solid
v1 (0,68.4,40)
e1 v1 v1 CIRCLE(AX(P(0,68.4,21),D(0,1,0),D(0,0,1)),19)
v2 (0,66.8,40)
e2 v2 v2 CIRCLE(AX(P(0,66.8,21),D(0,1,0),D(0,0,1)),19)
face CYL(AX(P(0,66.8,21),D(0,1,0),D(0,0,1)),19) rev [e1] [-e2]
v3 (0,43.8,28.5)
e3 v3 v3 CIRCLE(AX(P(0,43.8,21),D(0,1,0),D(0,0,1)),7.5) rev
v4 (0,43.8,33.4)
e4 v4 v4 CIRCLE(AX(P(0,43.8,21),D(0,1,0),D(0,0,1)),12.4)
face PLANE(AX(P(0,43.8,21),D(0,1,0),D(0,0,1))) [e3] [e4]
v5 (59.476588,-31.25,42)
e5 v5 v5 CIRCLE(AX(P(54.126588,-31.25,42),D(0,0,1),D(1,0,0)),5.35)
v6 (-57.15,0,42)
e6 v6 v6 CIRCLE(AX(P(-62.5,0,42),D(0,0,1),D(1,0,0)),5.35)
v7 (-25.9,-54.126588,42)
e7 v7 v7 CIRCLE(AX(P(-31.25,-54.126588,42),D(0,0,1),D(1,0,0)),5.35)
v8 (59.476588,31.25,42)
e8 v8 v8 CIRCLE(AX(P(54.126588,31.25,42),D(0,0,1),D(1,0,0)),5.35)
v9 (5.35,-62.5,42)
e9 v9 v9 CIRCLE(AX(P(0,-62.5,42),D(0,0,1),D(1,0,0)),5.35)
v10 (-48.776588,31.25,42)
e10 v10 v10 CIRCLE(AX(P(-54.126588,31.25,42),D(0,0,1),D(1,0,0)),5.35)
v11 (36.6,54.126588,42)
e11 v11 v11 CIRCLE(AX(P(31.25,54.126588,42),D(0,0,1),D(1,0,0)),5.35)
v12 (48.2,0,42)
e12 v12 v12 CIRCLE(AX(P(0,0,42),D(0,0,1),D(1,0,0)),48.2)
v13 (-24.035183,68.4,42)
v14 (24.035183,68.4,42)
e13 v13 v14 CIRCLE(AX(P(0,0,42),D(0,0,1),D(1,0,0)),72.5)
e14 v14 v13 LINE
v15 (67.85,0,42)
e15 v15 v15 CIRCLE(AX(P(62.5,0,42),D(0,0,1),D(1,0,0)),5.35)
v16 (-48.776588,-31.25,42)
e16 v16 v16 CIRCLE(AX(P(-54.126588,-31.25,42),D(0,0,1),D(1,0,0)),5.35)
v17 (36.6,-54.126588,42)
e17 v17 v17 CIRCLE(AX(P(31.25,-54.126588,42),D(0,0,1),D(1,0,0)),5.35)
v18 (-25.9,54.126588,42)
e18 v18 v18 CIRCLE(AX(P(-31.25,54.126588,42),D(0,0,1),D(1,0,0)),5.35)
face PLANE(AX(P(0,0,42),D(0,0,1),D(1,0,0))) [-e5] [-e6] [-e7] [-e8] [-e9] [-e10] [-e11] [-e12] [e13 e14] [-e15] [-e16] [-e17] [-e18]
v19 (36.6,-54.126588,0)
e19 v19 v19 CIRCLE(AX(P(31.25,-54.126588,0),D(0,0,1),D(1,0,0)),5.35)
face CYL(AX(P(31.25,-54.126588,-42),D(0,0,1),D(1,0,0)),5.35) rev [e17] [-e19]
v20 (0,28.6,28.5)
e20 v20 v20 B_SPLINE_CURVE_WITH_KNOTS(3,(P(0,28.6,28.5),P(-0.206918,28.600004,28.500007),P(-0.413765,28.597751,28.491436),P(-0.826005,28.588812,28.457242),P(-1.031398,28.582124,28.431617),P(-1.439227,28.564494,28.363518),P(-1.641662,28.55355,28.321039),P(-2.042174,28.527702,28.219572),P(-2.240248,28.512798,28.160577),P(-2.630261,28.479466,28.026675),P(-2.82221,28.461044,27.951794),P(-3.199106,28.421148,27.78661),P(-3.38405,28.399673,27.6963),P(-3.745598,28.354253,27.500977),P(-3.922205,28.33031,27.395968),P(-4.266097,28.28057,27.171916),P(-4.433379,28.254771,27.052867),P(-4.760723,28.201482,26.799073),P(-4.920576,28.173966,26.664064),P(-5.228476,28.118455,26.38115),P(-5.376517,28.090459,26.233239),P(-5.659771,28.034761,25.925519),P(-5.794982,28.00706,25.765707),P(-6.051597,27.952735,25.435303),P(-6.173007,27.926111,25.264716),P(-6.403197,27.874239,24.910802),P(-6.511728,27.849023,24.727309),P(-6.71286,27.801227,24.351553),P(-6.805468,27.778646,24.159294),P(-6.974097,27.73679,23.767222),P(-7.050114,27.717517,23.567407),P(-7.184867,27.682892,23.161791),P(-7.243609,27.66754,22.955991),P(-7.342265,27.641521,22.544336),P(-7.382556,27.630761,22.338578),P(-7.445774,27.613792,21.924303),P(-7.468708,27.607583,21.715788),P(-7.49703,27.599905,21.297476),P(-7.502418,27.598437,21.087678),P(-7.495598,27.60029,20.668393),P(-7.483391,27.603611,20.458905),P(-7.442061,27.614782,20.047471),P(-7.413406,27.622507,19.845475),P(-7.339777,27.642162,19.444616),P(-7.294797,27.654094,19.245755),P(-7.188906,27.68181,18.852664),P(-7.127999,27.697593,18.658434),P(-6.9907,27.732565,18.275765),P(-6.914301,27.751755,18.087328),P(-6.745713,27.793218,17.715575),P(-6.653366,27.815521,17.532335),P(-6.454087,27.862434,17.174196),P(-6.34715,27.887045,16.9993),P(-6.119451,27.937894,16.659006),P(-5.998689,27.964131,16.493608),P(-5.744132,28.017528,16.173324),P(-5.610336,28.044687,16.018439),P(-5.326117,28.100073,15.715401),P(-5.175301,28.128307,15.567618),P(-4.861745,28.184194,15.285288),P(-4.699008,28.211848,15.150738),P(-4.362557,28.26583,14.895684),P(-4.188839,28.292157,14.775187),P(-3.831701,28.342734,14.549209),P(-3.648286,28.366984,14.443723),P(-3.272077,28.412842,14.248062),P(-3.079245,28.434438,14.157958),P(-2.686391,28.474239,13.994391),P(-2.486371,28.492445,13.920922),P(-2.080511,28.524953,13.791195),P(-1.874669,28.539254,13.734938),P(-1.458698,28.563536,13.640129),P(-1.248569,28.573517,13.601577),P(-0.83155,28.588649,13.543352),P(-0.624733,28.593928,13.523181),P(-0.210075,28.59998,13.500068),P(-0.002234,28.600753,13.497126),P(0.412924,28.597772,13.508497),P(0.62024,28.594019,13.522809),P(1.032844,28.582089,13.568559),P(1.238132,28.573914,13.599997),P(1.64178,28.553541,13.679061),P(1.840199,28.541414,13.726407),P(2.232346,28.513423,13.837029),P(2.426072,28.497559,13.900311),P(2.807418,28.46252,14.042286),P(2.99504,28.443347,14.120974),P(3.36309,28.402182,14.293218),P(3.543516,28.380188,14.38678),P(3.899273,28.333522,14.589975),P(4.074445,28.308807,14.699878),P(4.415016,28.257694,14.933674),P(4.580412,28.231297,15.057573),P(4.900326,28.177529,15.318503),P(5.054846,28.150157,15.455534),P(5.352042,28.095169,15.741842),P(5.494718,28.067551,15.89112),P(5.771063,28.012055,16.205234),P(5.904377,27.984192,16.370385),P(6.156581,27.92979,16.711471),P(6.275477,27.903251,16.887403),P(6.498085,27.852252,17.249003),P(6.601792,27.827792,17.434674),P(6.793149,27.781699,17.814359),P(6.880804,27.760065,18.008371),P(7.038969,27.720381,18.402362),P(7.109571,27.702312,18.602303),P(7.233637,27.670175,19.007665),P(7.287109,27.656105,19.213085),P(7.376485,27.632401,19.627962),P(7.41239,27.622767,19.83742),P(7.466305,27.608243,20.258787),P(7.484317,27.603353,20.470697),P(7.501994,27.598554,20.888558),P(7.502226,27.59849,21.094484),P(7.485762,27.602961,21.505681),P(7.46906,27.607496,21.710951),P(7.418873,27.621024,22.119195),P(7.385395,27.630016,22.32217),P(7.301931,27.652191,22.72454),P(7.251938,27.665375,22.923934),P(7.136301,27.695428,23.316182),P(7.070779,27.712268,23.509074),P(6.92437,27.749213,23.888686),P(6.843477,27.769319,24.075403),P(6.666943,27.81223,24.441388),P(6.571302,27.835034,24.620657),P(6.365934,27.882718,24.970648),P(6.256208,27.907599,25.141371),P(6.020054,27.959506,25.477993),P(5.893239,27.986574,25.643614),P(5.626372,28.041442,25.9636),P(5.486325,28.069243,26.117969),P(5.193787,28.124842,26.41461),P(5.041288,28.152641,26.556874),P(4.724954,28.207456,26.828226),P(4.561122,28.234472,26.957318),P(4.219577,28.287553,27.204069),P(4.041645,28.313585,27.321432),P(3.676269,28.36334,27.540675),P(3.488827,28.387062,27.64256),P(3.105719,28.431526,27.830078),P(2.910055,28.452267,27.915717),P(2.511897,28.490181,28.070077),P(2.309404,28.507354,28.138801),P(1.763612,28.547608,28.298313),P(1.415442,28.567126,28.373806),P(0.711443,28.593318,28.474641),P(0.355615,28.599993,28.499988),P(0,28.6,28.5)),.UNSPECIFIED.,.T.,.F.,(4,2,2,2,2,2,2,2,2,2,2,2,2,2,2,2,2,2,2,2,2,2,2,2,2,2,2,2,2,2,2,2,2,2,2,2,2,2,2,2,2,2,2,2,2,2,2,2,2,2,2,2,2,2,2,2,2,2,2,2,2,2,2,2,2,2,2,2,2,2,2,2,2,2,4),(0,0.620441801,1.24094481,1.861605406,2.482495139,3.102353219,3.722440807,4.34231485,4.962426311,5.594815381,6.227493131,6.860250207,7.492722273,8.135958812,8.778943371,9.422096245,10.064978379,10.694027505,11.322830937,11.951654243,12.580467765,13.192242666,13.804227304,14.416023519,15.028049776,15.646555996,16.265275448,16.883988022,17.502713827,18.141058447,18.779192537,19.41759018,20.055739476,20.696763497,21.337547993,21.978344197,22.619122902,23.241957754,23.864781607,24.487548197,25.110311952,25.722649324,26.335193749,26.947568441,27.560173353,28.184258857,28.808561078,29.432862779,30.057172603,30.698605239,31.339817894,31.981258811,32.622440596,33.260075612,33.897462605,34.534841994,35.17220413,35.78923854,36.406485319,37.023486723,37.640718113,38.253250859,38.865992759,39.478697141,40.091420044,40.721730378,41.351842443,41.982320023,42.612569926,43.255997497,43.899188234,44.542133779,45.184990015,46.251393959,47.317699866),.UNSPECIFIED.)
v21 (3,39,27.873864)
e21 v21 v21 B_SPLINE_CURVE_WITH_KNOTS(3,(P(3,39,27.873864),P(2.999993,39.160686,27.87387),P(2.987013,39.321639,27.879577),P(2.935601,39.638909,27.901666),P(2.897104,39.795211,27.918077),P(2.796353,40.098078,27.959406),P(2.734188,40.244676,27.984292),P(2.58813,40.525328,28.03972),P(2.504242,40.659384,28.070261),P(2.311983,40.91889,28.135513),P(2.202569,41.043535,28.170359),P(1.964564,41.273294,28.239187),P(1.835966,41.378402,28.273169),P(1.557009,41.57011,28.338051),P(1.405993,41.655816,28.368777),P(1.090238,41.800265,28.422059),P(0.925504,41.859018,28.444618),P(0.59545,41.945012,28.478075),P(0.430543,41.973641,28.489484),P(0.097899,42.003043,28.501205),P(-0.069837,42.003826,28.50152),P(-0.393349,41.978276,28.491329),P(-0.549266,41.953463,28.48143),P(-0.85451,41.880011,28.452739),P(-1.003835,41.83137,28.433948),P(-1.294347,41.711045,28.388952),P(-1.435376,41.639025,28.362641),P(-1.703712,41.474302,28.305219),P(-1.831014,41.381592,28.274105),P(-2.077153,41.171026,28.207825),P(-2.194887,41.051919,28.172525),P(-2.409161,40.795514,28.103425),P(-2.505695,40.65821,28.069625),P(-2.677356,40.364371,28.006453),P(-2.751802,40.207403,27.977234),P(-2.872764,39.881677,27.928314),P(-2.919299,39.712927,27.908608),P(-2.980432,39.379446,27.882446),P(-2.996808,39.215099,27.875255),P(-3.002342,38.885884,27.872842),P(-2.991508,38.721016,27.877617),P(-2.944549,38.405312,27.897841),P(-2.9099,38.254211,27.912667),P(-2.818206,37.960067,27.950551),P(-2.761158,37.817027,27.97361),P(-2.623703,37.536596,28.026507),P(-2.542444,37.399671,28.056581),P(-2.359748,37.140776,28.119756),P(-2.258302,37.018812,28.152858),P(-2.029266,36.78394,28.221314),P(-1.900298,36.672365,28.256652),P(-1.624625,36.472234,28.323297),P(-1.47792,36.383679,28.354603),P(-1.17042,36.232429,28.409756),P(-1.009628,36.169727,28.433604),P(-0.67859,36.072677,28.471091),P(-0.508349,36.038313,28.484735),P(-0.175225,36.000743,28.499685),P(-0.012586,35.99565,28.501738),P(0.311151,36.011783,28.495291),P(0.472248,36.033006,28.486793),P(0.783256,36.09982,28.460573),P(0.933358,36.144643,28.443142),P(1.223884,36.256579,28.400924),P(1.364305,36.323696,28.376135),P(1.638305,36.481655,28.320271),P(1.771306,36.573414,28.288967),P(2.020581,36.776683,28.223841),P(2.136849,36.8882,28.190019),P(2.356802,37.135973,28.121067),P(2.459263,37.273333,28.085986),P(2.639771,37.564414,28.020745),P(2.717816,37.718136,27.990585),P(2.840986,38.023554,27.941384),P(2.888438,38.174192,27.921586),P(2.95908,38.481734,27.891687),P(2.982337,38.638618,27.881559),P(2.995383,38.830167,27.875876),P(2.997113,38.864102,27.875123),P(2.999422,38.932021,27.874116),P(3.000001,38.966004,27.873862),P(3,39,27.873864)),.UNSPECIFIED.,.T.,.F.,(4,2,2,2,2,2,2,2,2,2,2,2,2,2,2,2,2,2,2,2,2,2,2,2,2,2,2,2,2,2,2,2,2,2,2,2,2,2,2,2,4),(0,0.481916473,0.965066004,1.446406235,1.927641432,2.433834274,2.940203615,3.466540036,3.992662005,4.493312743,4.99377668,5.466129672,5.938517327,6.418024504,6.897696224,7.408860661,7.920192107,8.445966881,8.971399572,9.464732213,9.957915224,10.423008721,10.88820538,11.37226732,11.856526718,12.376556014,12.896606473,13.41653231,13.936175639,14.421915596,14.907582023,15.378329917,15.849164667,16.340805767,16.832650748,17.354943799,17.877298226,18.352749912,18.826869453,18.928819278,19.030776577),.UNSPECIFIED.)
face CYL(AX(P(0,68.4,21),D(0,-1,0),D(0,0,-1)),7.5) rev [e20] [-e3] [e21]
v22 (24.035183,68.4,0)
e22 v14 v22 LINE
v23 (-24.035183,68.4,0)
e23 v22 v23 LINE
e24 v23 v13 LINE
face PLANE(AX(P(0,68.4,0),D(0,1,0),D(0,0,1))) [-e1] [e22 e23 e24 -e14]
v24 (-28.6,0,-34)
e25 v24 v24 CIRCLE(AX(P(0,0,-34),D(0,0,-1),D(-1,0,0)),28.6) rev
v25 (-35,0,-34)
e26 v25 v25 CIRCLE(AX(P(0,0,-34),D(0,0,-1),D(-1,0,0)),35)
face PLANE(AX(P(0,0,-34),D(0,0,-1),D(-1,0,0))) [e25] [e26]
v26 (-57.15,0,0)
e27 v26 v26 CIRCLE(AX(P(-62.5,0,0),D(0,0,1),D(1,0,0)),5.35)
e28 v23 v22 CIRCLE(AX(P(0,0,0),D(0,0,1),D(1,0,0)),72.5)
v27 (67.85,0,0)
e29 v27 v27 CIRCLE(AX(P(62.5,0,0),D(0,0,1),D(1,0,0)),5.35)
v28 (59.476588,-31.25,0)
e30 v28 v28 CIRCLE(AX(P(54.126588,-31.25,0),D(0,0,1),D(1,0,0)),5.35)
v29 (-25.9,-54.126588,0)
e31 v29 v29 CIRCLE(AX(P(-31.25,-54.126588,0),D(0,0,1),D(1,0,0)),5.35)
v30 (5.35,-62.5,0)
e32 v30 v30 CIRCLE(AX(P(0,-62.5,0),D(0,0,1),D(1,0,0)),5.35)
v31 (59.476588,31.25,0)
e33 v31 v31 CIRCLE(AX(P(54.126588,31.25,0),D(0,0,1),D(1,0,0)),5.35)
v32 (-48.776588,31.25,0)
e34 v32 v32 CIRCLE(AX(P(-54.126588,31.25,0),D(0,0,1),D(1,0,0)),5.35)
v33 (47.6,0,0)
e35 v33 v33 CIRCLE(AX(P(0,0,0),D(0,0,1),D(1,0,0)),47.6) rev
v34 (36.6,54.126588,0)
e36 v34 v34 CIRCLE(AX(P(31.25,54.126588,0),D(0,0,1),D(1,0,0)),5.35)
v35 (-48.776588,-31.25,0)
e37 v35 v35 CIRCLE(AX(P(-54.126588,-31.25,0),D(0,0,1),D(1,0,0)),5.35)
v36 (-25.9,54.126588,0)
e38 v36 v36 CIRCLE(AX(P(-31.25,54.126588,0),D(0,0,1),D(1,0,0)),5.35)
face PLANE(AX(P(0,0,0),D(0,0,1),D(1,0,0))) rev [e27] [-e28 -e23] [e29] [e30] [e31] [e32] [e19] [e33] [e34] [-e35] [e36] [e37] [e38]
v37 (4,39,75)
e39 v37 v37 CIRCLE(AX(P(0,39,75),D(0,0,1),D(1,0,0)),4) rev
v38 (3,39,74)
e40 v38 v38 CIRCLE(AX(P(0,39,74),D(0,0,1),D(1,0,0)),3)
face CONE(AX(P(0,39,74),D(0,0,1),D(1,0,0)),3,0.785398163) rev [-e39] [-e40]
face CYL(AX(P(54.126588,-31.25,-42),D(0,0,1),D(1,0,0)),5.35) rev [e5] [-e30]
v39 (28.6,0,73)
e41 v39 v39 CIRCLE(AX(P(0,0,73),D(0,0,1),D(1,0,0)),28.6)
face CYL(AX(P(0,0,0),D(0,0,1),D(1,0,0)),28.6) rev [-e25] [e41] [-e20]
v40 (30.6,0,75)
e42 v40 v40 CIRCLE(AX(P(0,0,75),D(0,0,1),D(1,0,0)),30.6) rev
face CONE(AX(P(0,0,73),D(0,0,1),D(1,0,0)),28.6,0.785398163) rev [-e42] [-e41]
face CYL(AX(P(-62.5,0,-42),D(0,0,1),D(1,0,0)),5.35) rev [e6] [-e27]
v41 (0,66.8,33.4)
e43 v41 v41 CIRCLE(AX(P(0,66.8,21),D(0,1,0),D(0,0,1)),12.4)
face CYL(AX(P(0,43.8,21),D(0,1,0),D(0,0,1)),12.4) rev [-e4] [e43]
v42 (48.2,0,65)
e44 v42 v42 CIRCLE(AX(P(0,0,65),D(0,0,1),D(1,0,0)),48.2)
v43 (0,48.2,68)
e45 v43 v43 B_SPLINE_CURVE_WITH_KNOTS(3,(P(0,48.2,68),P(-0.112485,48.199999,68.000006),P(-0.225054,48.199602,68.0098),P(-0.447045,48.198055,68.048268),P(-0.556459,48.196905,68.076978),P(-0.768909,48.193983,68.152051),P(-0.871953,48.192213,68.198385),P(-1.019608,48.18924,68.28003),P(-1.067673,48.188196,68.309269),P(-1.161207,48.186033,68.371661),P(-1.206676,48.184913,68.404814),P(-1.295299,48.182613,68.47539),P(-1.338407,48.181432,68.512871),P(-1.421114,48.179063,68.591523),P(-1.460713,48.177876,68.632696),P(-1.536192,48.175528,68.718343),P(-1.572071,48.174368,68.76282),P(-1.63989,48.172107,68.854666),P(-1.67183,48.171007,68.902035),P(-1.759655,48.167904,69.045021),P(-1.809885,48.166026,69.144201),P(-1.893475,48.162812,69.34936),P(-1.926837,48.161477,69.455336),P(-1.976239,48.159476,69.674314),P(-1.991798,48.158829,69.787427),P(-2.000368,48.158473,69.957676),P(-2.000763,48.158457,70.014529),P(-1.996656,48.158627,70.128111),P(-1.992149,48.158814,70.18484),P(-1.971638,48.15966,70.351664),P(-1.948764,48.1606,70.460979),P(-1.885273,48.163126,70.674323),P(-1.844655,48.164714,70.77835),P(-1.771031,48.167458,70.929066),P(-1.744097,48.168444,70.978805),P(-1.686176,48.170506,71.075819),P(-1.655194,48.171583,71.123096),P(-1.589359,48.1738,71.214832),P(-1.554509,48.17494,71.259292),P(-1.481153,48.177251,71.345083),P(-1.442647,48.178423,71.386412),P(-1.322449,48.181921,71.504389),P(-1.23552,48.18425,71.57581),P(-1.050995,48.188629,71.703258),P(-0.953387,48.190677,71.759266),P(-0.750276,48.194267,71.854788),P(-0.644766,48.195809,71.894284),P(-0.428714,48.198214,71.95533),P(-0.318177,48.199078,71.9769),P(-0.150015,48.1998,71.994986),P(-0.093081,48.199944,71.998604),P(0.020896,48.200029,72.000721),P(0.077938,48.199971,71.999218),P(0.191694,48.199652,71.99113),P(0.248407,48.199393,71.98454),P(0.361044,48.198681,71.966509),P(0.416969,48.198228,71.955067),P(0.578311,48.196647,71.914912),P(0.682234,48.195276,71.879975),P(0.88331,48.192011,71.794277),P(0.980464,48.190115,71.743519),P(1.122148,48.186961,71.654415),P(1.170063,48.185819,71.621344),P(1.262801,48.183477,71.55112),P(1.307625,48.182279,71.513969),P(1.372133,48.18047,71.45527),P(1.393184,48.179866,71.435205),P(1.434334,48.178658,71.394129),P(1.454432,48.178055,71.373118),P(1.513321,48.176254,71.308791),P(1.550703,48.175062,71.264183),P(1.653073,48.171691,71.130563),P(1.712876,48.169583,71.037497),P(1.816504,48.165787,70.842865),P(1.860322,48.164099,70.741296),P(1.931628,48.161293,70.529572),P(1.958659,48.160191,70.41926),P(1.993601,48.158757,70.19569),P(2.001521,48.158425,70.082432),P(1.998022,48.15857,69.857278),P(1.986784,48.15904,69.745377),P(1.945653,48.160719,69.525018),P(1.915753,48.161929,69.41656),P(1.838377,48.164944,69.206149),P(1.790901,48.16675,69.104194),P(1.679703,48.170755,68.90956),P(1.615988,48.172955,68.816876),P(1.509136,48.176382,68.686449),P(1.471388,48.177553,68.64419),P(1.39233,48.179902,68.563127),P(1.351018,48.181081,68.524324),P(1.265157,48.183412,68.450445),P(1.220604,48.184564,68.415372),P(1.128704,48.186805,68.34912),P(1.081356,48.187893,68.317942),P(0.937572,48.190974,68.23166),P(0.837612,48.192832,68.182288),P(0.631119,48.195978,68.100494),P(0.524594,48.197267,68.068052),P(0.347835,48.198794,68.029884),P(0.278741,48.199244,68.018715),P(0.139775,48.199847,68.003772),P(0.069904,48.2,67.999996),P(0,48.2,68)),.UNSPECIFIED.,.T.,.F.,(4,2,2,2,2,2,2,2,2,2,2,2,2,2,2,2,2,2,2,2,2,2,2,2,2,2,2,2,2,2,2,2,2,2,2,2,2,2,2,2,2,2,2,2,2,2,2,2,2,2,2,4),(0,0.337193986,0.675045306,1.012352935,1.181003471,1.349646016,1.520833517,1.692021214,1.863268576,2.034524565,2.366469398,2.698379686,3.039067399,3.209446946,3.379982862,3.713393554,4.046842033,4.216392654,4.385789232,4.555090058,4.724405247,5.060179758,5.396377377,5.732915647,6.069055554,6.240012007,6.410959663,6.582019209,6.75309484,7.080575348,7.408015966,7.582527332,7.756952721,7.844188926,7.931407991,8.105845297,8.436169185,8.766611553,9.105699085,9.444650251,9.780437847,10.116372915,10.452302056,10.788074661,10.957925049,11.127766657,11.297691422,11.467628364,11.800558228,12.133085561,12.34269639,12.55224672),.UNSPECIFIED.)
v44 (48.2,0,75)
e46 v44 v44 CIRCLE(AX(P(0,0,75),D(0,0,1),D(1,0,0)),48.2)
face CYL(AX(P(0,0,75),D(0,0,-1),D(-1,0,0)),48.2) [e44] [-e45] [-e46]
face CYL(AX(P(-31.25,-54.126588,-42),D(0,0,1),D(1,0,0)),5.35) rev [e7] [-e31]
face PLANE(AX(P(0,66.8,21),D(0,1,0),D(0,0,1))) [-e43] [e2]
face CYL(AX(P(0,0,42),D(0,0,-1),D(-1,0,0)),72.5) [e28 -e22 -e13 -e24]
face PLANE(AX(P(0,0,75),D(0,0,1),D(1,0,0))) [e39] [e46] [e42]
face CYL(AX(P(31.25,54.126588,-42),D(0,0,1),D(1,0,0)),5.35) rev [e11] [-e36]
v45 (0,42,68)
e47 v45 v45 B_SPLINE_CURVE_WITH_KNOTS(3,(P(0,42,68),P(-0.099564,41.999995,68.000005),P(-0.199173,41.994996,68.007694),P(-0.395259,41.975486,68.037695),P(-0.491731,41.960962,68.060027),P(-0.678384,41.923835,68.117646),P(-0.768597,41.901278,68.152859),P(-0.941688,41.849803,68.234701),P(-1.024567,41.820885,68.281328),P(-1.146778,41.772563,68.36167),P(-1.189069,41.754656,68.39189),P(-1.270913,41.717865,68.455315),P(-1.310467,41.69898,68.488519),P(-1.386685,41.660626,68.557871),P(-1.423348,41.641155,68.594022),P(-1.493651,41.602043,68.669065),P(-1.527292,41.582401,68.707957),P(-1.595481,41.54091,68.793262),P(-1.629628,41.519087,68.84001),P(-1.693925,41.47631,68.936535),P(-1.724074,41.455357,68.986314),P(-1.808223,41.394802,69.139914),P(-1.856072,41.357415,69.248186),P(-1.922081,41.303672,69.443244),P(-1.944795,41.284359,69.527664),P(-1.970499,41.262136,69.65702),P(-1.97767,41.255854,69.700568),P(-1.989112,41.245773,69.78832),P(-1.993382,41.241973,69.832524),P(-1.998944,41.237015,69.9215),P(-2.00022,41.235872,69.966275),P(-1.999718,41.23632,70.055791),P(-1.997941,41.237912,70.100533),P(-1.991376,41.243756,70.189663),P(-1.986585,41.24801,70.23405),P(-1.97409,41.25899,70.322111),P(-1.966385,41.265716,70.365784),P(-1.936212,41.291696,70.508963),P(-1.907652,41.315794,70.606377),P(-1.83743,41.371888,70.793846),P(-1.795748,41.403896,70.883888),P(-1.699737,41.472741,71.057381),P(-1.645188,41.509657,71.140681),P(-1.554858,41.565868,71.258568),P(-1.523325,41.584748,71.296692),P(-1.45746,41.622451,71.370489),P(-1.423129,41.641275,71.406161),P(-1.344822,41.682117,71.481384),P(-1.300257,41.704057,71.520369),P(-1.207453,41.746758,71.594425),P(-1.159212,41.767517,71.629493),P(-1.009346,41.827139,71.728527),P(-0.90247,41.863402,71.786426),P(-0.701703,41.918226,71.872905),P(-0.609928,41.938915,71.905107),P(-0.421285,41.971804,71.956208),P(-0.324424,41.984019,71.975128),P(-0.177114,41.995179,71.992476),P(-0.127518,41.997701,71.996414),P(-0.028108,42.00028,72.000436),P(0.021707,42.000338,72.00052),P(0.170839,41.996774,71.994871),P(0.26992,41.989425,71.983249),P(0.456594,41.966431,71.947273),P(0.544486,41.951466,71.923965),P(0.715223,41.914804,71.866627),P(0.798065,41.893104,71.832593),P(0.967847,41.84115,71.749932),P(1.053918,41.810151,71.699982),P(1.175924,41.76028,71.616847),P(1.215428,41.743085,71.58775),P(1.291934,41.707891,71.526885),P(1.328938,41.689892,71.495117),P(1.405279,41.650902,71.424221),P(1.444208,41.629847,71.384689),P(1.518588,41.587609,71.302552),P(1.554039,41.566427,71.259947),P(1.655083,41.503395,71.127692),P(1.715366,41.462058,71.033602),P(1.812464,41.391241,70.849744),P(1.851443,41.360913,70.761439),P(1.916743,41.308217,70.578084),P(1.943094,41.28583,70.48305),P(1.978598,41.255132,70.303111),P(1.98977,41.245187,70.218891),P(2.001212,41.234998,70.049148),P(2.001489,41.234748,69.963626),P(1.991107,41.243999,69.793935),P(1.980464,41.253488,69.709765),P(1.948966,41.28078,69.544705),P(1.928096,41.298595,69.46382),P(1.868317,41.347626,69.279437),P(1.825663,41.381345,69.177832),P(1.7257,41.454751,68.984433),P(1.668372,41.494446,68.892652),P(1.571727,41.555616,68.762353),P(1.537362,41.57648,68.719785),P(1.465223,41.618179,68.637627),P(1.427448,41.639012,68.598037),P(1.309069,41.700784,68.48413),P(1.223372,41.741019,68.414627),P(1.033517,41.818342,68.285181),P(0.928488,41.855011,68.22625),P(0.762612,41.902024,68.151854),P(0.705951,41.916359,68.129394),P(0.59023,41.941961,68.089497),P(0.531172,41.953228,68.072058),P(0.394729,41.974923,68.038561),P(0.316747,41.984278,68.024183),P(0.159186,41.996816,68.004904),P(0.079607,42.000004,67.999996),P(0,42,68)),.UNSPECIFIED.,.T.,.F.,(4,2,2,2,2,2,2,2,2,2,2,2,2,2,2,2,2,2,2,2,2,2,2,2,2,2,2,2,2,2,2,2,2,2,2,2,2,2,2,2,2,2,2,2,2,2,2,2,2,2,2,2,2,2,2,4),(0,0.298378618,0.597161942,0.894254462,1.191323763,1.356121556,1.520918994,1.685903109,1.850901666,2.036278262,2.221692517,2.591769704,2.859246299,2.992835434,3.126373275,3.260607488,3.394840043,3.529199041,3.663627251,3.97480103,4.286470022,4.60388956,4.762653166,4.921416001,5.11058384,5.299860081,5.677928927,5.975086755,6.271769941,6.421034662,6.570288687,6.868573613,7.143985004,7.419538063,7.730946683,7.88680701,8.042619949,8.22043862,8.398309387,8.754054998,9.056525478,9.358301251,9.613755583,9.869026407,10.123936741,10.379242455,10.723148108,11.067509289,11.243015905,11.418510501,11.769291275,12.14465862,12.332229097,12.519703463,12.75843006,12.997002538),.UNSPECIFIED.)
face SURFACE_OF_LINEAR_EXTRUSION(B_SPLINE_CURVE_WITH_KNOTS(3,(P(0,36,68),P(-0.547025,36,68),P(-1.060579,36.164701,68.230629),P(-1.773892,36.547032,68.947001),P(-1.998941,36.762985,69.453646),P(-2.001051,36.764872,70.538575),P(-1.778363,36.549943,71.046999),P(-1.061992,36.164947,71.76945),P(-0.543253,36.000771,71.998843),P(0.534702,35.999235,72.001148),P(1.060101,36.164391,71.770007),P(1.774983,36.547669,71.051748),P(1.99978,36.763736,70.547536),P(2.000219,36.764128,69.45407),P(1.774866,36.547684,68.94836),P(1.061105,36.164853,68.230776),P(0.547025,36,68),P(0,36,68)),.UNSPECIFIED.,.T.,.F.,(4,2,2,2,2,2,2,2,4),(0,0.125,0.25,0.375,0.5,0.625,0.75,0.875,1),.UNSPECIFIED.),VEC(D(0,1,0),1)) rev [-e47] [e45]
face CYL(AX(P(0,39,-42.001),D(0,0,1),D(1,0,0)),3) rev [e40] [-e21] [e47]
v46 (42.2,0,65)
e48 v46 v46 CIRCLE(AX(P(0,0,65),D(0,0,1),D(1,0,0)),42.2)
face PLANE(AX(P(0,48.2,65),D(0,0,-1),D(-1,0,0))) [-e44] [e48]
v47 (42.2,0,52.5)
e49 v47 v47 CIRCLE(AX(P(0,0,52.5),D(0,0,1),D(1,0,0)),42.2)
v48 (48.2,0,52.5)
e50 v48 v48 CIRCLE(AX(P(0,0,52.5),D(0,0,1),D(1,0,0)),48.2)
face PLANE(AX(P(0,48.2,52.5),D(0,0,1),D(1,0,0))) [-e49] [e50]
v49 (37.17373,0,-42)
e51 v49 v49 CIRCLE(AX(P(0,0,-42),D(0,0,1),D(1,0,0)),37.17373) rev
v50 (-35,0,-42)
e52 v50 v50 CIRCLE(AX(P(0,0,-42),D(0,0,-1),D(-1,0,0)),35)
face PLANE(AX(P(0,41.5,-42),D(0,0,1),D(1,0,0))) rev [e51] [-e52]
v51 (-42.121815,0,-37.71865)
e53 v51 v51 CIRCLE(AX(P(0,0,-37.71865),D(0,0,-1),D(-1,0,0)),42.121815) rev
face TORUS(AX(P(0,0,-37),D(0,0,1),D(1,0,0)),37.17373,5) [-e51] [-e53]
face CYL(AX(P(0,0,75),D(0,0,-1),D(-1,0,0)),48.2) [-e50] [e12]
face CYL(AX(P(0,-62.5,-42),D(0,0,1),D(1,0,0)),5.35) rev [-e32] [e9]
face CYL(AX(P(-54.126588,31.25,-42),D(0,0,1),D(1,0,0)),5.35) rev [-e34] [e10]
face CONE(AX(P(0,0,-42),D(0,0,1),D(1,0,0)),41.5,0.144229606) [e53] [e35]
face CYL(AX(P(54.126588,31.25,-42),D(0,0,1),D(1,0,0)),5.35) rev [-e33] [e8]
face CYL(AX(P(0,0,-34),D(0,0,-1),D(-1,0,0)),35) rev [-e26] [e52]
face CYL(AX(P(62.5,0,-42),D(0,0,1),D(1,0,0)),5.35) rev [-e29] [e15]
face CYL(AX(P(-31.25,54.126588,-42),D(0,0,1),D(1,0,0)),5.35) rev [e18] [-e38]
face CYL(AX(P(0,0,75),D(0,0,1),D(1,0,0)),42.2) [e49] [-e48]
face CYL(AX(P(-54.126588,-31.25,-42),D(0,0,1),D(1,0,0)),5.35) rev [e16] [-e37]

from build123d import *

# Parameters (mm, degrees)
SKETCH1_R                      = 72.5
BOSS_EXTRUDE1_DEPTH            = 42
SKETCH2_R                      = 48.2
BOSS_EXTRUDE2_DEPTH            = 33
SKETCH4_R                      = 28.6
CUT_EXTRUDE1_DEPTH             = 156.568312969
SKETCH5_R                      = 35
CUT_EXTRUDE2_DEPTH             = 8
SKETCH6_W                      = 12.5
SKETCH6_H                      = 6
FILLET1_R                      = 5
SKETCH7_R                      = 5.35
CUT_EXTRUDE3_DEPTH             = 156.568312969
CIRPATTERN1_COUNT              = 12
CHAMFER1_SIZE                  = 2
CUT_EXTRUDE4_DEPTH             = 177.599830124
CUT_EXTRUDE4_DEPTH_BACK        = 1.6
SKETCH8_W                      = 51
SKETCH8_H                      = 63
BOSS_EXTRUDE3_START            = -42
SKETCH10_R                     = 5.35
BOSS_EXTRUDE3_DEPTH            = 42
SKETCH9_R                      = 19
CUT_EXTRUDE5_DEPTH             = 1.6
SKETCH11_R                     = 12.4
CUT_EXTRUDE6_DEPTH             = 23
CUT_EXTRUDE7_REACH             = 158.227
CUT_EXTRUDE7_END_RADIUS        = 28.6
SKETCH12_R                     = 7.5
CUT_EXTRUDE7_DIRECTION_2_DEPTH = 157.227206337
CUT_EXTRUDE8_REACH             = 157.568
CUT_EXTRUDE8_END_RADIUS        = 7.5
SKETCH13_R                     = 3
CHAMFER2_SIZE                  = 1
CUT_EXTRUDE11_START            = 41.236068177
CUT_EXTRUDE11_DEPTH            = 6.963931924


# Read off the part's stored shape, not the designer's step: Cut-Extrude11
with BuildPart() as part:
    # Sketch1 → Boss-Extrude1 (new body)
    with BuildSketch(Plane.XY):
        with Locations(Location((0, 0, 0), (0, 0, 180))):
            Circle(SKETCH1_R)
    extrude(amount=BOSS_EXTRUDE1_DEPTH)

    # Sketch2 → Boss-Extrude2 (add)
    with BuildSketch(Plane.XY.offset(42)):
        Circle(SKETCH2_R)
    extrude(amount=BOSS_EXTRUDE2_DEPTH)

    # Sketch3 → Revolve1 (revolve)
    with BuildSketch(Plane(origin=(0, 0, 0), x_dir=(0, 0, -1), z_dir=(1, 0, 0)), mode=Mode.PRIVATE) as revolve1_sk:
        Polygon((0, 47.6), (42, 41.5), (42, 28.6), (0, 28.6), align=None)
    revolve(revolve1_sk.sketch.rotate(Axis((0, 0, 0), (0, 0, -1)), 90), axis=Axis((0, 0, 0), (0, 0, -1)))

    # Sketch4 → Cut-Extrude1 (cut, through all)
    with BuildSketch(Plane.XY.offset(75)):
        Circle(SKETCH4_R)
    extrude(amount=-CUT_EXTRUDE1_DEPTH, mode=Mode.SUBTRACT)

    # Sketch5 → Cut-Extrude2 (cut)
    with BuildSketch(Plane(origin=(0, 0, -42), x_dir=(-1, 0, 0), z_dir=(0, 0, -1))):
        Circle(SKETCH5_R)
    extrude(amount=-CUT_EXTRUDE2_DEPTH, mode=Mode.SUBTRACT)

    # Sketch6 → Cut-Revolve1 (revolve, cut)
    with BuildSketch(Plane(origin=(0, 0, 0), x_dir=(0, 0, -1), z_dir=(1, 0, 0)), mode=Mode.PRIVATE) as cut_revolve1_sk:
        with Locations((-58.75, 45.2)):
            Rectangle(SKETCH6_W, SKETCH6_H)
    revolve(cut_revolve1_sk.sketch.rotate(Axis((0, 0, 75), (0, 0, -1)), 90), axis=Axis((0, 0, 75), (0, 0, -1)), mode=Mode.SUBTRACT)

    # Fillet1
    fillet1_edges = [part.edges().sort_by_distance(p)[0] for p in [
        (-41.5, 0, -42),
    ]]
    fillet(fillet1_edges, radius=FILLET1_R)

    # Sketch7 → Cut-Extrude3 (cut, through all)
    with BuildSketch(Plane.XY.offset(75)):
        with Locations((0, 62.5)):
            Circle(SKETCH7_R)
    cut_extrude3 = extrude(amount=-CUT_EXTRUDE3_DEPTH, mode=Mode.SUBTRACT)

    # CirPattern1: Cut-Extrude3 ×12 about axis
    cirpattern1_axis = Axis((0, 0, 0), (0, 0, 1))
    for i in range(1, CIRPATTERN1_COUNT):
        add(cut_extrude3.rotate(cirpattern1_axis, i * 360 / CIRPATTERN1_COUNT), mode=Mode.SUBTRACT)

    # Chamfer1
    chamfer1_edges = [part.edges().sort_by_distance(p)[0] for p in [
        (-28.6, 0, 75),
    ]]
    chamfer(chamfer1_edges, length=CHAMFER1_SIZE)

    # Sketch8 → Cut-Extrude4 (cut, two sides: drawn at the far end of the back side and taken through both)
    with BuildSketch(Plane(origin=(0, 70, 0), x_dir=(1, 0, 0), z_dir=(0, 1, 0)).offset(-CUT_EXTRUDE4_DEPTH_BACK)):
        with Locations((0, -21)):
            Rectangle(SKETCH8_W, SKETCH8_H)
    extrude(amount=CUT_EXTRUDE4_DEPTH + CUT_EXTRUDE4_DEPTH_BACK, mode=Mode.SUBTRACT)

    # Sketch10 → Boss-Extrude3 (add)
    with BuildSketch(Plane(origin=(0, 0, 0), x_dir=(-1, 0, 0), z_dir=(0, 0, -1)).offset(BOSS_EXTRUDE3_START)):
        with Locations((0, 62.5)):
            Circle(SKETCH10_R)
    extrude(amount=BOSS_EXTRUDE3_DEPTH)

    # Sketch9 → Cut-Extrude5 (cut)
    with BuildSketch(Plane(origin=(0, 68.4, 0), x_dir=(1, 0, 0), z_dir=(0, 1, 0))):
        with Locations(Location((0, -21, 0), (0, 0, 270))):
            Circle(SKETCH9_R)
    extrude(amount=-CUT_EXTRUDE5_DEPTH, mode=Mode.SUBTRACT)

    # Sketch11 → Cut-Extrude6 (cut)
    with BuildSketch(Plane(origin=(0, 66.8, 0), x_dir=(1, 0, 0), z_dir=(0, 1, 0))):
        with Locations(Location((0, -21, 0), (0, 0, 270))):
            Circle(SKETCH11_R)
    extrude(amount=-CUT_EXTRUDE6_DEPTH, mode=Mode.SUBTRACT)

    # Cut-Extrude7: up to this cylinder (the profile starts outside it)
    cut_extrude7_end = Plane(origin=(0, 0, 21), z_dir=(0, 0, 1)) * Cylinder(CUT_EXTRUDE7_END_RADIUS, 374.654, mode=Mode.PRIVATE)
    # Sketch12 → Cut-Extrude7 (cut, up to the surface)
    with BuildSketch(Plane(origin=(0, 43.8, 0), x_dir=(1, 0, 0), z_dir=(0, 1, 0)), mode=Mode.PRIVATE) as cut_extrude7_sk1:
        with Locations(Location((0, -21, 0), (0, 0, 270))):
            Circle(SKETCH12_R)
    cut_extrude7_tool1 = extrude(cut_extrude7_sk1.sketch, amount=-CUT_EXTRUDE7_REACH, mode=Mode.PRIVATE) - cut_extrude7_end
    add(cut_extrude7_tool1.solids().sort_by_distance((0, 43.8, 21))[0], mode=Mode.SUBTRACT)

    # Sketch12 → Cut-Extrude7 direction 2 (cut)
    with BuildSketch(Plane(origin=(0, 43.8, 0), x_dir=(1, 0, 0), z_dir=(0, 1, 0))):
        with Locations(Location((0, -21, 0), (0, 0, 270))):
            Circle(SKETCH12_R)
    extrude(amount=CUT_EXTRUDE7_DIRECTION_2_DEPTH, mode=Mode.SUBTRACT)

    # Cut-Extrude8: up to this cylinder (the profile starts outside it)
    cut_extrude8_end = Plane(origin=(0, 39, 21), z_dir=(0, -1, 0)) * Cylinder(CUT_EXTRUDE8_END_RADIUS, 331.136, mode=Mode.PRIVATE)
    # Sketch13 → Cut-Extrude8 (cut, up to the surface)
    with BuildSketch(Plane.XY.offset(75), mode=Mode.PRIVATE) as cut_extrude8_sk1:
        with Locations((0, 39)):
            Circle(SKETCH13_R)
    cut_extrude8_tool1 = extrude(cut_extrude8_sk1.sketch, amount=-CUT_EXTRUDE8_REACH, mode=Mode.PRIVATE) - cut_extrude8_end
    add(cut_extrude8_tool1.solids().sort_by_distance((0, 39, 75))[0], mode=Mode.SUBTRACT)

    # Chamfer2
    chamfer2_edges = [part.edges().sort_by_distance(p)[0] for p in [
        (-3, 39, 75),
    ]]
    chamfer(chamfer2_edges, length=CHAMFER2_SIZE)

    # Cut-Extrude11 outline → Cut-Extrude11 (cut)
    with BuildSketch(Plane(origin=(0, 0, 0), x_dir=(1, 0, 0), z_dir=(0, 1, 0)).offset(CUT_EXTRUDE11_START)):
        with BuildLine():
            add(Edge.make_bspline(
                [(0, -68), (-0.54702537, -68), (-1.060578619, -68.230628831), (-1.773892363, -68.947000843), (-1.998941239, -69.453645947), (-2.001051196, -70.538574914), (-1.778362753, -71.046998742), (-1.061992496, -71.769449741), (-0.543253329, -71.998843249), (0.534702492, -72.001147611), (1.060100727, -71.770006855), (1.774982575, -71.051748391), (1.999780329, -70.547535826), (2.000219348, -69.454070146), (1.774866101, -68.94836038), (1.061104675, -68.230776319), (0.54702537, -68), (0, -68)],
                knots=[0, 0, 0, 0, 0.125, 0.125, 0.25, 0.25, 0.375, 0.375, 0.5, 0.5, 0.625, 0.625, 0.75, 0.75, 0.875, 0.875, 1, 1, 1, 1], degree=3))
        make_face()
    extrude(amount=CUT_EXTRUDE11_DEPTH, mode=Mode.SUBTRACT)


solid = part.part
